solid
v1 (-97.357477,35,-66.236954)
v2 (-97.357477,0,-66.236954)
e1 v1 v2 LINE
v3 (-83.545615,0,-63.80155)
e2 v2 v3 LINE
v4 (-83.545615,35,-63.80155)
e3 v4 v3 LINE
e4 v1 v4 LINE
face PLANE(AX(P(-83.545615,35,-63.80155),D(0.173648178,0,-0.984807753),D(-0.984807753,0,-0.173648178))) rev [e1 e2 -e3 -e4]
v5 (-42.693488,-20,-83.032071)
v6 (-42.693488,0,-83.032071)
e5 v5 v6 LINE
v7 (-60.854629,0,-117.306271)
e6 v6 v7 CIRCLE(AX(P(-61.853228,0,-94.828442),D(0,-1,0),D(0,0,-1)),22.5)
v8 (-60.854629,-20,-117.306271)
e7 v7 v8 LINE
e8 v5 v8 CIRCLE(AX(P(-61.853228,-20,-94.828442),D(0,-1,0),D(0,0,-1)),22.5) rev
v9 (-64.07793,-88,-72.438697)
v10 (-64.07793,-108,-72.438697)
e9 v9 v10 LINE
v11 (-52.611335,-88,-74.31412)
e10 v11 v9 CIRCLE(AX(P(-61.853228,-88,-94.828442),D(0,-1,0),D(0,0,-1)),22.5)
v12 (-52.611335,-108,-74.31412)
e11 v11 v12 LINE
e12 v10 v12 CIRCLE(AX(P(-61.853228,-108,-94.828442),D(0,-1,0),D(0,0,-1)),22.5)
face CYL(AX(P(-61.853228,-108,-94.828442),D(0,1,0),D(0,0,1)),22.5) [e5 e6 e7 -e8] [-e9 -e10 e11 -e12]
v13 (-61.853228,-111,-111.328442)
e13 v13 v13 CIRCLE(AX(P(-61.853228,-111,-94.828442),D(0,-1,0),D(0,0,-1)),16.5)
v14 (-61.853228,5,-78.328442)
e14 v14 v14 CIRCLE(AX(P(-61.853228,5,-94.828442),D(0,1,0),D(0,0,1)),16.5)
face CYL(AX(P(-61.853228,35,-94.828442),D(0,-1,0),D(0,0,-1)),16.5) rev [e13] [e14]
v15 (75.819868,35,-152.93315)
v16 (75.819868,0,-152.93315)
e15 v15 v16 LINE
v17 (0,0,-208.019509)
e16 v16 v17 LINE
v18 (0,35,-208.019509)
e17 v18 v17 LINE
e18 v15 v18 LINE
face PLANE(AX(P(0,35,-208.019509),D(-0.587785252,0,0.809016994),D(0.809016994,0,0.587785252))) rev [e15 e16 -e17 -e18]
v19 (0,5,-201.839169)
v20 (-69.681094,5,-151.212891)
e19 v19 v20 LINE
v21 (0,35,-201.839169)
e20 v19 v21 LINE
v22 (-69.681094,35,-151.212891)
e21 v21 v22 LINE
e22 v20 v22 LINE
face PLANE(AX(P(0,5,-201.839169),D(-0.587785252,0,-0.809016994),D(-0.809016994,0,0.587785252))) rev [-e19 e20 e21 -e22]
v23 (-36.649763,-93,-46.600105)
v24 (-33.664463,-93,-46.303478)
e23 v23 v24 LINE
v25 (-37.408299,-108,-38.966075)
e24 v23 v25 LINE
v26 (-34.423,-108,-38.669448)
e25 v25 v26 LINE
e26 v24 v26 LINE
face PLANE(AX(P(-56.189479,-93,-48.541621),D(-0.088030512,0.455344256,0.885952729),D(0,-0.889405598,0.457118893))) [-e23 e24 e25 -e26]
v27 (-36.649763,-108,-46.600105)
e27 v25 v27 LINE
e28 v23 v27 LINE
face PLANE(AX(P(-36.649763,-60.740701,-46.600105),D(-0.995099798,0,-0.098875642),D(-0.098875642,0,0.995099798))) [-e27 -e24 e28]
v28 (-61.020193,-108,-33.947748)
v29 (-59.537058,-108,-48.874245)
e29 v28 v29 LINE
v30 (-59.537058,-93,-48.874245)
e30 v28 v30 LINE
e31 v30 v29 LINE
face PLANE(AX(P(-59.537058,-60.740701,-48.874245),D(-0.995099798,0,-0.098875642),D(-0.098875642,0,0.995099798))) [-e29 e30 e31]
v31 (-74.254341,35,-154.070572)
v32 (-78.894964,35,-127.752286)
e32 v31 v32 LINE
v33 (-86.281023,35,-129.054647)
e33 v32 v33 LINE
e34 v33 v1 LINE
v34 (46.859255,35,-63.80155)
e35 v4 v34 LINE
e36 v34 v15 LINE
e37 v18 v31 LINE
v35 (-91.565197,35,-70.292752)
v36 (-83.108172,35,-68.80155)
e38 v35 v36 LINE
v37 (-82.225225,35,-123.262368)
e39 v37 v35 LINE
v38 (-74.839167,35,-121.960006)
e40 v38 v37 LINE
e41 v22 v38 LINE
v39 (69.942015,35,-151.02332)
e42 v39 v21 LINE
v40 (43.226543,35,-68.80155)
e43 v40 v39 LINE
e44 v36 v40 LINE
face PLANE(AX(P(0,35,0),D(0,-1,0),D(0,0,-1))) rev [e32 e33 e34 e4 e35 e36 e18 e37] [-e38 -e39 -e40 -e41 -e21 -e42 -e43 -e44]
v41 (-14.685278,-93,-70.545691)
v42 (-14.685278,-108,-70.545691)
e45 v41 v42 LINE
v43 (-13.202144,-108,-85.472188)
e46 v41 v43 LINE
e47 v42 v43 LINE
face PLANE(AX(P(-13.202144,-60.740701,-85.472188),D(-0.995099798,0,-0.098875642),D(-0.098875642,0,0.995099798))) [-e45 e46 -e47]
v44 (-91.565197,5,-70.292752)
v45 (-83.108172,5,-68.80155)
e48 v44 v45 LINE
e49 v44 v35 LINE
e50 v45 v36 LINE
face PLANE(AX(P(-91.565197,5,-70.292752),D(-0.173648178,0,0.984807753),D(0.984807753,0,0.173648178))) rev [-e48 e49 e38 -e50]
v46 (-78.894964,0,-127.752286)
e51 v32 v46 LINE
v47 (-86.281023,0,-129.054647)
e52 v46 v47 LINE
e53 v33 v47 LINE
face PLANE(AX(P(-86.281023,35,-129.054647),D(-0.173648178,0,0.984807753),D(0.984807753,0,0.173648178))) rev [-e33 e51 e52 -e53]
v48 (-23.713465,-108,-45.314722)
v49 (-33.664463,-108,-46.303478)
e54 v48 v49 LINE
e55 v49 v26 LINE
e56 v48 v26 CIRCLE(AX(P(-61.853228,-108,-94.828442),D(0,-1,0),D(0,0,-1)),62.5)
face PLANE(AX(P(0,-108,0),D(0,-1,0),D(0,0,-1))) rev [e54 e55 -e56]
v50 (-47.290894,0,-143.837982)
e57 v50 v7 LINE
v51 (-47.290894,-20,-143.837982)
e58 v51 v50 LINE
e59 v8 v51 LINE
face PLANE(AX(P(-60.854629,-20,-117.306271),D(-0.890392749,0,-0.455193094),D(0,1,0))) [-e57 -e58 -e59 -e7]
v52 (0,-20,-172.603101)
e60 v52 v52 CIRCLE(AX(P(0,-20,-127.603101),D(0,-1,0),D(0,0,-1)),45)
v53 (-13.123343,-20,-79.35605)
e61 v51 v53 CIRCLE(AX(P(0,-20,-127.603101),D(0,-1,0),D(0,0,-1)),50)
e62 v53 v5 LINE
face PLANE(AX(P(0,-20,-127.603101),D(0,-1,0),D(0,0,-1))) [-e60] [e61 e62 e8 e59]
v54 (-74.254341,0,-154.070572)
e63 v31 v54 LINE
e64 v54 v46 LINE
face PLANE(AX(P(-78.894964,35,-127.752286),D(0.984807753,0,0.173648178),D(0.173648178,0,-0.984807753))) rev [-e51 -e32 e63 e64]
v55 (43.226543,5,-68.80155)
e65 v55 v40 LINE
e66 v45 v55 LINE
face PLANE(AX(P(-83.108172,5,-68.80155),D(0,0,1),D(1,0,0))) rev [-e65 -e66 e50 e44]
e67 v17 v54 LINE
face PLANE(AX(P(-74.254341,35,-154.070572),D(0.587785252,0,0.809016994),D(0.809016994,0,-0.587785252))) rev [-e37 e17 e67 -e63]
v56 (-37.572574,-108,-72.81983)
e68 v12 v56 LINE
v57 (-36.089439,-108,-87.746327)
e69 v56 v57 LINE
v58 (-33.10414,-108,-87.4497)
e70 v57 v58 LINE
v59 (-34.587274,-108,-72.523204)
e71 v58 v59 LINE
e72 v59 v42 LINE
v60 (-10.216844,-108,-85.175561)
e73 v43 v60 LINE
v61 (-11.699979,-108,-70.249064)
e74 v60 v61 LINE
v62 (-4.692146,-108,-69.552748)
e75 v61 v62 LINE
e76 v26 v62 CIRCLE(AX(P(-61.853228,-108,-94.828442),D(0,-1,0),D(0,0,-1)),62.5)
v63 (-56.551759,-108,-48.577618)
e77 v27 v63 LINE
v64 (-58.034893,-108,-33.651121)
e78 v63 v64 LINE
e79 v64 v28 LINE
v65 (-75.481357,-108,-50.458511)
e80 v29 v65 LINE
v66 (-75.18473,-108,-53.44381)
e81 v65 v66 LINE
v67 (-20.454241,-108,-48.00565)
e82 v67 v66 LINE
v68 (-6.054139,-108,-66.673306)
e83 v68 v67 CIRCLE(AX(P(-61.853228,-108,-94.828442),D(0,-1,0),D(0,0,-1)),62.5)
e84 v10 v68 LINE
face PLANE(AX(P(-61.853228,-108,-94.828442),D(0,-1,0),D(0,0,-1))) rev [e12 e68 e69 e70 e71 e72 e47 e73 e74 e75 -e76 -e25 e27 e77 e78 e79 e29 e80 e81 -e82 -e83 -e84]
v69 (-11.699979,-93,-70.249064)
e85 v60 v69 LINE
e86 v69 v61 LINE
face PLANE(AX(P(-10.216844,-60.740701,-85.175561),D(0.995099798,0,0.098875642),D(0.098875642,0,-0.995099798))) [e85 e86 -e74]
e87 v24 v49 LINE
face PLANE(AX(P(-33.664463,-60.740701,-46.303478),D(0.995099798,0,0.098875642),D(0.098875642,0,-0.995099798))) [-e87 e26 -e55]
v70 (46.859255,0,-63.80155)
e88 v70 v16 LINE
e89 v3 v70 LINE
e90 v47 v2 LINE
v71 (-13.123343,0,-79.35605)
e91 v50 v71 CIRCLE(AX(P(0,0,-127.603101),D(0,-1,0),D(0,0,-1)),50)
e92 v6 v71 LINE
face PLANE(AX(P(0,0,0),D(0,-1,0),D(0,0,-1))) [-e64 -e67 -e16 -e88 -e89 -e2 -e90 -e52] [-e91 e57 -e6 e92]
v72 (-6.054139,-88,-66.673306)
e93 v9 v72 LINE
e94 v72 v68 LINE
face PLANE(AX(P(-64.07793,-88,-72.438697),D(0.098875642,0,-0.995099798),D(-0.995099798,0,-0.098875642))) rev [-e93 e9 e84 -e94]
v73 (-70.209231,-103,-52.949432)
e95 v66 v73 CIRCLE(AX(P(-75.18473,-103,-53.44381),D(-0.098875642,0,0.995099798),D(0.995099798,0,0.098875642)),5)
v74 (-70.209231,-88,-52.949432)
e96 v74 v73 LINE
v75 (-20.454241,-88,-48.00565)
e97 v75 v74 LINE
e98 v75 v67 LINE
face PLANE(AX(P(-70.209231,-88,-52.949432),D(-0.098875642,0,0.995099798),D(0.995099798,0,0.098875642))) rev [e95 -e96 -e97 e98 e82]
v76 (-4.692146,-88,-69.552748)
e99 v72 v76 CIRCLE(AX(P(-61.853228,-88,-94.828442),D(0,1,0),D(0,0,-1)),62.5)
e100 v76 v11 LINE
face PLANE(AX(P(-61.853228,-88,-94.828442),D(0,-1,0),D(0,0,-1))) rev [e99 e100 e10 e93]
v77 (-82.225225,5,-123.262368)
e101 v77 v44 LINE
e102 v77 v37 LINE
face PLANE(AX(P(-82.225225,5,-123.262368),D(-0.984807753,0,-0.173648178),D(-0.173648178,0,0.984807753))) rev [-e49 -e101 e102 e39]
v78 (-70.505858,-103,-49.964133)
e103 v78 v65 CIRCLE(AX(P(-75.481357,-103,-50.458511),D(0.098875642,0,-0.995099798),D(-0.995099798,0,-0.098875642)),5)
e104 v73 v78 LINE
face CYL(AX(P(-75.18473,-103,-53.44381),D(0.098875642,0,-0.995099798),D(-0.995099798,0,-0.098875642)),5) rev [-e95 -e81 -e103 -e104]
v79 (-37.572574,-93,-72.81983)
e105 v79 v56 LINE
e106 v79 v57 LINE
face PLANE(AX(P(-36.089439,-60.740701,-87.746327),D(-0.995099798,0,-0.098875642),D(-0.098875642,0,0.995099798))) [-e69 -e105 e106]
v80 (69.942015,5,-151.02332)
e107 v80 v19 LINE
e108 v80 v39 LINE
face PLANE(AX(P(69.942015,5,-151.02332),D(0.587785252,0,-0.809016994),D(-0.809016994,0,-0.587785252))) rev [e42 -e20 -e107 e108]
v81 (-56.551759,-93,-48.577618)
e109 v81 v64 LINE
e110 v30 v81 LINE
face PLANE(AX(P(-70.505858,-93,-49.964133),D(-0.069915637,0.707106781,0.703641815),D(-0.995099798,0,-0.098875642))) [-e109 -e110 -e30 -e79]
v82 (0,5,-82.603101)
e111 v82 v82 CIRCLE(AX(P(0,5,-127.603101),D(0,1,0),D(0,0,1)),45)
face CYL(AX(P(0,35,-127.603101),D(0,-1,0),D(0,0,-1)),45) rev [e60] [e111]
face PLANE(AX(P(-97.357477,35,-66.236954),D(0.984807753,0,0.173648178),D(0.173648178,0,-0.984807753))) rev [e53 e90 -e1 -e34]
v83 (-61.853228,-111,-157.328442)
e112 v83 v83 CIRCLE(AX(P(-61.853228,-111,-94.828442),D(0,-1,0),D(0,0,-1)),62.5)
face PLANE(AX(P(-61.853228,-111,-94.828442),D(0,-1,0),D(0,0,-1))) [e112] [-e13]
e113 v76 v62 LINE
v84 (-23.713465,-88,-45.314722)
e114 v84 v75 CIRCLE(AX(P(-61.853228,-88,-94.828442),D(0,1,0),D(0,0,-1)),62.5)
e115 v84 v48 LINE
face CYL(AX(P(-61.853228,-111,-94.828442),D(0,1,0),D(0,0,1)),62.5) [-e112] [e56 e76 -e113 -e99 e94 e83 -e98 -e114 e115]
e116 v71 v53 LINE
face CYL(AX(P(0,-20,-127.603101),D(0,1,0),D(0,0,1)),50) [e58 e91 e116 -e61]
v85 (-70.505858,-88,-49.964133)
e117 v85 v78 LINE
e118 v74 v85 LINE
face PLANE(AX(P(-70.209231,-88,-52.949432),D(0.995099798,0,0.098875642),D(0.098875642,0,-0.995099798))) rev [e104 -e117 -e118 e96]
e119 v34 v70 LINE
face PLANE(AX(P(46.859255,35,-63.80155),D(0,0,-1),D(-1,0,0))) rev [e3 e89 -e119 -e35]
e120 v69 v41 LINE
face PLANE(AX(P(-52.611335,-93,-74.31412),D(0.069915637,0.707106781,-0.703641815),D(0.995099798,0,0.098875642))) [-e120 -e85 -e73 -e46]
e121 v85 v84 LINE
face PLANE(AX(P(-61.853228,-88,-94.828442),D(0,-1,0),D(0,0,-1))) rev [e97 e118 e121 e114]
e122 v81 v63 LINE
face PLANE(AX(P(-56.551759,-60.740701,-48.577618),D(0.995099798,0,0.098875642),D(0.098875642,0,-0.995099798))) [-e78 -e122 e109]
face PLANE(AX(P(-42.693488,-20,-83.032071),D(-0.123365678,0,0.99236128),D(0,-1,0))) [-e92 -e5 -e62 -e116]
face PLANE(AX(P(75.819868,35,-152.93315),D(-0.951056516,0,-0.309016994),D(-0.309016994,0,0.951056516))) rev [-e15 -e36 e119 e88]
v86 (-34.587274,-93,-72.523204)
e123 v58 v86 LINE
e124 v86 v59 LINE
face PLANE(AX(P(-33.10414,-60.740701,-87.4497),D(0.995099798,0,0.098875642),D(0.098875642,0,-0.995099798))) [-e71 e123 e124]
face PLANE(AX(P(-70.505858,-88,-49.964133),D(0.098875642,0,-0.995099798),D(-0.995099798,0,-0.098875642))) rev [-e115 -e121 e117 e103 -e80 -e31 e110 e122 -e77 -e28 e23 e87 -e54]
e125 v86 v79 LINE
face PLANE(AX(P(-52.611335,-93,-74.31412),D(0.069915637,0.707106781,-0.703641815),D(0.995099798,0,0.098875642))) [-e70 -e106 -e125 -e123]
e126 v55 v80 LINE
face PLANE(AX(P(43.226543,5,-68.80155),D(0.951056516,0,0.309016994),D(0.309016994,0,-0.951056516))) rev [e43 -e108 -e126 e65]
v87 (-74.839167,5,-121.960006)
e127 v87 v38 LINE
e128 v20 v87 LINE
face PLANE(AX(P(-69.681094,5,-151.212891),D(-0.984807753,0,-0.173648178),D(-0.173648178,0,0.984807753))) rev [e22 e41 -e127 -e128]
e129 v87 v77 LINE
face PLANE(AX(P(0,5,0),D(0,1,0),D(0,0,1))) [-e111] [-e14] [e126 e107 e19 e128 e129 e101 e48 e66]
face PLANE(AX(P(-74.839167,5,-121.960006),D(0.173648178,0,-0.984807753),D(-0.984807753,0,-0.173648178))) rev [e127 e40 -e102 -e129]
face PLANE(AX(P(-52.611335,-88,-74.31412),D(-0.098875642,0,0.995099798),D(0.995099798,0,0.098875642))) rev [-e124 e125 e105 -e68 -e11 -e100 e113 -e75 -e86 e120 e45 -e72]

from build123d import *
from build123d.topology import SkipClean

# Parameters (mm, degrees)
SKETCH1_R               = 45
BOSS_EXTRUDE1_DEPTH     = 35
CUT_EXTRUDE1_DEPTH      = 30
BOSS_EXTRUDE2_START     = 20
SKETCH3_R               = 50
SKETCH3_R_2             = 45
BOSS_EXTRUDE2_DEPTH     = 20
SKETCH4_R               = 22.5
BOSS_EXTRUDE3_DEPTH     = 108
SKETCH5_R               = 62.5
BOSS_EXTRUDE4_DEPTH     = 3
CUT_EXTRUDE2_DEPTH      = 283.934340716
CUT_EXTRUDE2_DEPTH_BACK = 283.934340716
SKETCH6_R               = 16.5
CHAMFER1_START          = -20
CHAMFER1_DEPTH          = 20
BOSS_EXTRUDE5_START     = 20
BOSS_EXTRUDE5_DEPTH     = 20
CHAMFER3_START          = -59.701385296
CHAMFER3_DEPTH          = 31.623598411
CHAMFER3_START_2        = -32.908910756
CHAMFER3_2_DEPTH        = 24.320342802
CHAMFER3_START_3        = -75.100600507
CHAMFER3_3_DEPTH        = 17.710815412
CHAMFER3_START_4        = -108
CHAMFER3_4_DEPTH        = 20.0000001
CUT_EXTRUDE3_START      = 20
CUT_EXTRUDE3_DEPTH      = 20
CUT_EXTRUDE4_DEPTH      = 3
FILLET2_R               = 5


with BuildPart() as part:
    # Sketch1 → Boss-Extrude1 (new body)
    with BuildSketch(Plane(origin=(0, 0, 0), x_dir=(1, 0, 0), z_dir=(0, 1, 0))):
        Polygon((46.859255168, 63.80155033), (-83.545615043, 63.80155033), (-97.357476794, 66.23695421), (-86.281022646, 129.054647247), (-78.894964498, 127.752285914), (-74.254340533, 154.070572239), (0, 208.019508525), (75.819867549, 152.933150283), align=None)
        with Locations(Location((0, 127.60310066, 0), (0, 0, 90))):
            Circle(SKETCH1_R, mode=Mode.SUBTRACT)
    extrude(amount=BOSS_EXTRUDE1_DEPTH)

    # Sketch2 → Cut-Extrude1 (cut)
    with BuildSketch(Plane(origin=(0, 35, 0), x_dir=(1, 0, 0), z_dir=(0, 1, 0))):
        Polygon((69.942015026, 151.023320226), (0, 201.839168637), (-69.681093857, 151.212890552), (-74.839166621, 121.960006261), (-82.225224769, 123.262367593), (-91.56519714, 70.292752087), (-83.108171726, 68.80155033), (43.226542528, 68.80155033), align=None)
    extrude(amount=-CUT_EXTRUDE1_DEPTH, mode=Mode.SUBTRACT)

    # Sketch3 → Boss-Extrude2 (add)
    with BuildSketch(Plane.XZ.offset(BOSS_EXTRUDE2_START)):
        with Locations(Location((0, -127.60310066, 0), (0, 0, 270))):
            Circle(SKETCH3_R)
        with Locations(Location((0, -127.60310066, 0), (0, 0, 270))):
            Circle(SKETCH3_R_2, mode=Mode.SUBTRACT)
    extrude(amount=-BOSS_EXTRUDE2_DEPTH)

    # Sketch4 → Boss-Extrude3 (add)
    with BuildSketch(Plane.XZ):
        with Locations(Location((-61.853227661, -94.828442341, 0), (0, 0, 354.769849307))):
            Circle(SKETCH4_R)
    extrude(amount=BOSS_EXTRUDE3_DEPTH)

    # Sketch5 → Boss-Extrude4 (add)
    with BuildSketch(Plane.XZ.offset(108)):
        with Locations(Location((-61.853227661, -94.828442341, 0), (0, 0, 270))):
            Circle(SKETCH5_R)
    extrude(amount=BOSS_EXTRUDE4_DEPTH)

    # Sketch6 → Cut-Extrude2 (cut, two sides: drawn at the far end of the back side and taken through both)
    with BuildSketch(Plane.XZ.offset(111).offset(-CUT_EXTRUDE2_DEPTH_BACK)):
        with Locations(Location((-61.853227661, -94.828442341, 0), (0, 0, 270))):
            Circle(SKETCH6_R)
    extrude(amount=CUT_EXTRUDE2_DEPTH + CUT_EXTRUDE2_DEPTH_BACK, mode=Mode.SUBTRACT)

    # Chamfer1: read off the stored shape, not the designer's step
    # Chamfer1 outline → Chamfer1 (add)
    with BuildSketch(Plane(origin=(0, 0, 0), x_dir=(1, 0, 0), z_dir=(0, 1, 0)).offset(CHAMFER1_START)):
        with BuildLine():
            ThreePointArc((-47.573643712, 112.216469321), (-49.998001272, 128.050167568), (-47.290893773, 143.837981816))
            Line((-47.290893773, 143.837981816), (-60.85462884, 117.306271426))
            ThreePointArc((-60.85462884, 117.306271426), (-53.801380758, 115.838386688), (-47.573643712, 112.216469321))
        make_face()
        with BuildLine():
            Line((-42.693487755, 83.032071427), (-13.123343442, 79.356050419))
            ThreePointArc((-13.123343442, 79.356050419), (-27.706953652, 85.981895496), (-39.446904898, 96.879466533))
            ThreePointArc((-39.446904898, 96.879466533), (-39.947247216, 89.692488608), (-42.693487755, 83.032071427))
        make_face()
    extrude(amount=CHAMFER1_DEPTH)

    # Sketch7 → Boss-Extrude5 (add)
    with SkipClean():  # the faces are left unmerged after this step: merging them gives an invalid solid
        with BuildSketch(Plane(origin=(0, -108, 0), x_dir=(1, 0, 0), z_dir=(0, 1, 0)).offset(BOSS_EXTRUDE5_START)):
            with BuildLine():
                Line((-70.209230864, 52.9494319), (-20.454240978, 48.005649797))
                ThreePointArc((-20.454240978, 48.005649797), (-22.061100088, 46.632627344), (-23.713465467, 45.314721618))
                Line((-23.713465467, 45.314721618), (-70.50585779, 49.964132507))
                Line((-70.50585779, 49.964132507), (-70.209230864, 52.9494319))
            make_face()
            with BuildLine():
                Line((-64.077929608, 72.438696893), (-6.054139097, 66.673305768))
                ThreePointArc((-6.054139097, 66.673305768), (-5.354795719, 68.104348565), (-4.69214598, 69.552747672))
                Line((-4.69214598, 69.552747672), (-52.611335155, 74.314119956))
                ThreePointArc((-52.611335155, 74.314119956), (-58.221486515, 72.623477665), (-64.077929608, 72.438696893))
            make_face()
        extrude(amount=-BOSS_EXTRUDE5_DEPTH)

    # Chamfer3: read off the stored shape, not the designer's step
    # Chamfer3 outline → Chamfer3 (add)
    with SkipClean():  # the faces are left unmerged after this step: merging them gives an invalid solid
        with BuildSketch(Plane(origin=(0, 0, 0), x_dir=(0, 1, 0), z_dir=(0.9950997977115372, 0, 0.09887564206849853)).offset(CHAMFER3_START)):
            Polygon((-108, -68.747986192), (-108, -83.747986192), (-93, -68.747986192), align=None)
            Polygon((-108, -27.747986192), (-108, -42.747986192), (-93, -42.747986192), align=None)
        extrude(amount=CHAMFER3_DEPTH)

    # Chamfer3 2 outline → Chamfer3 2 (add)
    with SkipClean():  # the faces are left unmerged after this step: merging them gives an invalid solid
        with BuildSketch(Plane(origin=(0, 0, 0), x_dir=(0, 1, 0), z_dir=(0.9950997977115372, 0, 0.09887564206849853)).offset(CHAMFER3_START_2)):
            Polygon((-108, -68.747986192), (-108, -83.747986192), (-93, -68.747986192), align=None)
        extrude(amount=CHAMFER3_2_DEPTH)

    # Chamfer3 3 outline → Chamfer3 3 (add)
    with SkipClean():  # the faces are left unmerged after this step: merging them gives an invalid solid
        with BuildSketch(Plane(origin=(0, 0, 0), x_dir=(0, 1, 0), z_dir=(0.9950997977115372, 0, 0.09887564206849853)).offset(CHAMFER3_START_3)):
            Polygon((-108, -27.747986192), (-108, -42.747986192), (-93, -42.747986192), align=None)
        extrude(amount=CHAMFER3_3_DEPTH)

    # Chamfer3 4 outline → Chamfer3 4 (cut)
    with SkipClean():  # the faces are left unmerged after this step: merging them gives an invalid solid
        with BuildSketch(Plane(origin=(0, 0, 0), x_dir=(1, 0, 0), z_dir=(0, 1, 0)).offset(CHAMFER3_START_4)):
            with BuildLine():
                Line((-51.128200524, 89.240616922), (-51.879001502, 81.68443943))
                ThreePointArc((-51.879001502, 81.68443943), (-48.702503608, 84.863079484), (-46.501448484, 88.780891094))
                Line((-46.501448484, 88.780891094), (-51.128200524, 89.240616922))
            make_face()
            with BuildLine():
                ThreePointArc((-0.265846327, 84.186804289), (-2.029835327, 76.733920253), (-4.69214598, 69.552747672))
                Line((-4.69214598, 69.552747672), (-1.748980958, 69.260307324))
                Line((-1.748980958, 69.260307324), (-0.265846327, 84.186804289))
            make_face()
            with BuildLine():
                ThreePointArc((-23.713465467, 45.314721618), (-37.1988252, 37.396652892), (-52.227673534, 33.074100731))
                Line((-52.227673534, 33.074100731), (-25.196600099, 30.388224653))
                Line((-25.196600099, 30.388224653), (-23.713465467, 45.314721618))
            make_face()
        extrude(amount=CHAMFER3_4_DEPTH, mode=Mode.SUBTRACT)

    # Sketch9 → Cut-Extrude3 (cut)
    with SkipClean():  # the faces are left unmerged after this step: merging them gives an invalid solid
        with BuildSketch(Plane(origin=(0, -108, 0), x_dir=(1, 0, 0), z_dir=(0, 1, 0)).offset(CUT_EXTRUDE3_START)):
            Polygon((-61.020192816, 33.947747767), (-75.946689782, 35.430882398), (-74.463555151, 50.357379364), (-59.537058185, 48.874244733), align=None)
            Polygon((-56.551758792, 48.577617807), (-58.034893423, 33.651120841), (-38.132897469, 31.673608), (-36.649762838, 46.600104965), align=None)
            Polygon((-33.664463445, 46.303478039), (-35.147598076, 31.376981073), (-15.245602121, 29.399468232), (-13.76246749, 44.325965198), align=None)
            Polygon((-33.104139652, 87.449700478), (-34.587274283, 72.523203512), (-14.685278328, 70.54569067), (-13.202143697, 85.472187636), align=None)
            with BuildLine():
                Line((-36.089439045, 87.746327404), (-37.572573676, 72.819830438))
                Line((-37.572573676, 72.819830438), (-52.611335155, 74.314119956))
                ThreePointArc((-52.611335155, 74.314119956), (-44.996440318, 79.925465442), (-40.360787322, 88.170739412))
                Line((-40.360787322, 88.170739412), (-36.089439045, 87.746327404))
            make_face()
            with BuildLine():
                Line((-0.265846327, 84.186804289), (-10.216844304, 85.17556071))
                Line((-10.216844304, 85.17556071), (-11.699978935, 70.249063744))
                Line((-11.699978935, 70.249063744), (-4.69214598, 69.552747672))
                ThreePointArc((-4.69214598, 69.552747672), (-2.029835327, 76.733920253), (-0.265846327, 84.186804289))
            make_face()
        extrude(amount=-CUT_EXTRUDE3_DEPTH, mode=Mode.SUBTRACT)

    # Sketch10 → Cut-Extrude4 (cut)
    with SkipClean():  # the faces are left unmerged after this step: merging them gives an invalid solid
        with BuildSketch(Plane(origin=(-37.891198026, 0, -3.764965627), x_dir=(-0.09887564206850087, 0, 0.995099797711537), z_dir=(-0.995099797711537, 0, -0.09887564206850087))):
            Polygon((-42.747986192, -93), (-35.076363954, -108), (-30.076363954, -108), (-30.076363954, -93), align=None)
        extrude(amount=CUT_EXTRUDE4_DEPTH, mode=Mode.SUBTRACT)

    # Fillet2
    # the kernel refuses this fillet: 5 mm, written as the material it adds along each edge
    with BuildSketch(Plane(origin=(-70.50585779, -108, -49.964132507), x_dir=(-0.9950997977115372, 0, -0.09887564206849696), z_dir=(0.09887564206849697, 0, -0.9950997977115373))) as fillet2_piece_1:
        with BuildLine():
            CenterArc((FILLET2_R, FILLET2_R), FILLET2_R, 180, 90)
            Line((0, FILLET2_R), (0, 0))
            Line((0, 0), (FILLET2_R, 0))
        make_face()
    extrude(amount=3)


solid = part.part
